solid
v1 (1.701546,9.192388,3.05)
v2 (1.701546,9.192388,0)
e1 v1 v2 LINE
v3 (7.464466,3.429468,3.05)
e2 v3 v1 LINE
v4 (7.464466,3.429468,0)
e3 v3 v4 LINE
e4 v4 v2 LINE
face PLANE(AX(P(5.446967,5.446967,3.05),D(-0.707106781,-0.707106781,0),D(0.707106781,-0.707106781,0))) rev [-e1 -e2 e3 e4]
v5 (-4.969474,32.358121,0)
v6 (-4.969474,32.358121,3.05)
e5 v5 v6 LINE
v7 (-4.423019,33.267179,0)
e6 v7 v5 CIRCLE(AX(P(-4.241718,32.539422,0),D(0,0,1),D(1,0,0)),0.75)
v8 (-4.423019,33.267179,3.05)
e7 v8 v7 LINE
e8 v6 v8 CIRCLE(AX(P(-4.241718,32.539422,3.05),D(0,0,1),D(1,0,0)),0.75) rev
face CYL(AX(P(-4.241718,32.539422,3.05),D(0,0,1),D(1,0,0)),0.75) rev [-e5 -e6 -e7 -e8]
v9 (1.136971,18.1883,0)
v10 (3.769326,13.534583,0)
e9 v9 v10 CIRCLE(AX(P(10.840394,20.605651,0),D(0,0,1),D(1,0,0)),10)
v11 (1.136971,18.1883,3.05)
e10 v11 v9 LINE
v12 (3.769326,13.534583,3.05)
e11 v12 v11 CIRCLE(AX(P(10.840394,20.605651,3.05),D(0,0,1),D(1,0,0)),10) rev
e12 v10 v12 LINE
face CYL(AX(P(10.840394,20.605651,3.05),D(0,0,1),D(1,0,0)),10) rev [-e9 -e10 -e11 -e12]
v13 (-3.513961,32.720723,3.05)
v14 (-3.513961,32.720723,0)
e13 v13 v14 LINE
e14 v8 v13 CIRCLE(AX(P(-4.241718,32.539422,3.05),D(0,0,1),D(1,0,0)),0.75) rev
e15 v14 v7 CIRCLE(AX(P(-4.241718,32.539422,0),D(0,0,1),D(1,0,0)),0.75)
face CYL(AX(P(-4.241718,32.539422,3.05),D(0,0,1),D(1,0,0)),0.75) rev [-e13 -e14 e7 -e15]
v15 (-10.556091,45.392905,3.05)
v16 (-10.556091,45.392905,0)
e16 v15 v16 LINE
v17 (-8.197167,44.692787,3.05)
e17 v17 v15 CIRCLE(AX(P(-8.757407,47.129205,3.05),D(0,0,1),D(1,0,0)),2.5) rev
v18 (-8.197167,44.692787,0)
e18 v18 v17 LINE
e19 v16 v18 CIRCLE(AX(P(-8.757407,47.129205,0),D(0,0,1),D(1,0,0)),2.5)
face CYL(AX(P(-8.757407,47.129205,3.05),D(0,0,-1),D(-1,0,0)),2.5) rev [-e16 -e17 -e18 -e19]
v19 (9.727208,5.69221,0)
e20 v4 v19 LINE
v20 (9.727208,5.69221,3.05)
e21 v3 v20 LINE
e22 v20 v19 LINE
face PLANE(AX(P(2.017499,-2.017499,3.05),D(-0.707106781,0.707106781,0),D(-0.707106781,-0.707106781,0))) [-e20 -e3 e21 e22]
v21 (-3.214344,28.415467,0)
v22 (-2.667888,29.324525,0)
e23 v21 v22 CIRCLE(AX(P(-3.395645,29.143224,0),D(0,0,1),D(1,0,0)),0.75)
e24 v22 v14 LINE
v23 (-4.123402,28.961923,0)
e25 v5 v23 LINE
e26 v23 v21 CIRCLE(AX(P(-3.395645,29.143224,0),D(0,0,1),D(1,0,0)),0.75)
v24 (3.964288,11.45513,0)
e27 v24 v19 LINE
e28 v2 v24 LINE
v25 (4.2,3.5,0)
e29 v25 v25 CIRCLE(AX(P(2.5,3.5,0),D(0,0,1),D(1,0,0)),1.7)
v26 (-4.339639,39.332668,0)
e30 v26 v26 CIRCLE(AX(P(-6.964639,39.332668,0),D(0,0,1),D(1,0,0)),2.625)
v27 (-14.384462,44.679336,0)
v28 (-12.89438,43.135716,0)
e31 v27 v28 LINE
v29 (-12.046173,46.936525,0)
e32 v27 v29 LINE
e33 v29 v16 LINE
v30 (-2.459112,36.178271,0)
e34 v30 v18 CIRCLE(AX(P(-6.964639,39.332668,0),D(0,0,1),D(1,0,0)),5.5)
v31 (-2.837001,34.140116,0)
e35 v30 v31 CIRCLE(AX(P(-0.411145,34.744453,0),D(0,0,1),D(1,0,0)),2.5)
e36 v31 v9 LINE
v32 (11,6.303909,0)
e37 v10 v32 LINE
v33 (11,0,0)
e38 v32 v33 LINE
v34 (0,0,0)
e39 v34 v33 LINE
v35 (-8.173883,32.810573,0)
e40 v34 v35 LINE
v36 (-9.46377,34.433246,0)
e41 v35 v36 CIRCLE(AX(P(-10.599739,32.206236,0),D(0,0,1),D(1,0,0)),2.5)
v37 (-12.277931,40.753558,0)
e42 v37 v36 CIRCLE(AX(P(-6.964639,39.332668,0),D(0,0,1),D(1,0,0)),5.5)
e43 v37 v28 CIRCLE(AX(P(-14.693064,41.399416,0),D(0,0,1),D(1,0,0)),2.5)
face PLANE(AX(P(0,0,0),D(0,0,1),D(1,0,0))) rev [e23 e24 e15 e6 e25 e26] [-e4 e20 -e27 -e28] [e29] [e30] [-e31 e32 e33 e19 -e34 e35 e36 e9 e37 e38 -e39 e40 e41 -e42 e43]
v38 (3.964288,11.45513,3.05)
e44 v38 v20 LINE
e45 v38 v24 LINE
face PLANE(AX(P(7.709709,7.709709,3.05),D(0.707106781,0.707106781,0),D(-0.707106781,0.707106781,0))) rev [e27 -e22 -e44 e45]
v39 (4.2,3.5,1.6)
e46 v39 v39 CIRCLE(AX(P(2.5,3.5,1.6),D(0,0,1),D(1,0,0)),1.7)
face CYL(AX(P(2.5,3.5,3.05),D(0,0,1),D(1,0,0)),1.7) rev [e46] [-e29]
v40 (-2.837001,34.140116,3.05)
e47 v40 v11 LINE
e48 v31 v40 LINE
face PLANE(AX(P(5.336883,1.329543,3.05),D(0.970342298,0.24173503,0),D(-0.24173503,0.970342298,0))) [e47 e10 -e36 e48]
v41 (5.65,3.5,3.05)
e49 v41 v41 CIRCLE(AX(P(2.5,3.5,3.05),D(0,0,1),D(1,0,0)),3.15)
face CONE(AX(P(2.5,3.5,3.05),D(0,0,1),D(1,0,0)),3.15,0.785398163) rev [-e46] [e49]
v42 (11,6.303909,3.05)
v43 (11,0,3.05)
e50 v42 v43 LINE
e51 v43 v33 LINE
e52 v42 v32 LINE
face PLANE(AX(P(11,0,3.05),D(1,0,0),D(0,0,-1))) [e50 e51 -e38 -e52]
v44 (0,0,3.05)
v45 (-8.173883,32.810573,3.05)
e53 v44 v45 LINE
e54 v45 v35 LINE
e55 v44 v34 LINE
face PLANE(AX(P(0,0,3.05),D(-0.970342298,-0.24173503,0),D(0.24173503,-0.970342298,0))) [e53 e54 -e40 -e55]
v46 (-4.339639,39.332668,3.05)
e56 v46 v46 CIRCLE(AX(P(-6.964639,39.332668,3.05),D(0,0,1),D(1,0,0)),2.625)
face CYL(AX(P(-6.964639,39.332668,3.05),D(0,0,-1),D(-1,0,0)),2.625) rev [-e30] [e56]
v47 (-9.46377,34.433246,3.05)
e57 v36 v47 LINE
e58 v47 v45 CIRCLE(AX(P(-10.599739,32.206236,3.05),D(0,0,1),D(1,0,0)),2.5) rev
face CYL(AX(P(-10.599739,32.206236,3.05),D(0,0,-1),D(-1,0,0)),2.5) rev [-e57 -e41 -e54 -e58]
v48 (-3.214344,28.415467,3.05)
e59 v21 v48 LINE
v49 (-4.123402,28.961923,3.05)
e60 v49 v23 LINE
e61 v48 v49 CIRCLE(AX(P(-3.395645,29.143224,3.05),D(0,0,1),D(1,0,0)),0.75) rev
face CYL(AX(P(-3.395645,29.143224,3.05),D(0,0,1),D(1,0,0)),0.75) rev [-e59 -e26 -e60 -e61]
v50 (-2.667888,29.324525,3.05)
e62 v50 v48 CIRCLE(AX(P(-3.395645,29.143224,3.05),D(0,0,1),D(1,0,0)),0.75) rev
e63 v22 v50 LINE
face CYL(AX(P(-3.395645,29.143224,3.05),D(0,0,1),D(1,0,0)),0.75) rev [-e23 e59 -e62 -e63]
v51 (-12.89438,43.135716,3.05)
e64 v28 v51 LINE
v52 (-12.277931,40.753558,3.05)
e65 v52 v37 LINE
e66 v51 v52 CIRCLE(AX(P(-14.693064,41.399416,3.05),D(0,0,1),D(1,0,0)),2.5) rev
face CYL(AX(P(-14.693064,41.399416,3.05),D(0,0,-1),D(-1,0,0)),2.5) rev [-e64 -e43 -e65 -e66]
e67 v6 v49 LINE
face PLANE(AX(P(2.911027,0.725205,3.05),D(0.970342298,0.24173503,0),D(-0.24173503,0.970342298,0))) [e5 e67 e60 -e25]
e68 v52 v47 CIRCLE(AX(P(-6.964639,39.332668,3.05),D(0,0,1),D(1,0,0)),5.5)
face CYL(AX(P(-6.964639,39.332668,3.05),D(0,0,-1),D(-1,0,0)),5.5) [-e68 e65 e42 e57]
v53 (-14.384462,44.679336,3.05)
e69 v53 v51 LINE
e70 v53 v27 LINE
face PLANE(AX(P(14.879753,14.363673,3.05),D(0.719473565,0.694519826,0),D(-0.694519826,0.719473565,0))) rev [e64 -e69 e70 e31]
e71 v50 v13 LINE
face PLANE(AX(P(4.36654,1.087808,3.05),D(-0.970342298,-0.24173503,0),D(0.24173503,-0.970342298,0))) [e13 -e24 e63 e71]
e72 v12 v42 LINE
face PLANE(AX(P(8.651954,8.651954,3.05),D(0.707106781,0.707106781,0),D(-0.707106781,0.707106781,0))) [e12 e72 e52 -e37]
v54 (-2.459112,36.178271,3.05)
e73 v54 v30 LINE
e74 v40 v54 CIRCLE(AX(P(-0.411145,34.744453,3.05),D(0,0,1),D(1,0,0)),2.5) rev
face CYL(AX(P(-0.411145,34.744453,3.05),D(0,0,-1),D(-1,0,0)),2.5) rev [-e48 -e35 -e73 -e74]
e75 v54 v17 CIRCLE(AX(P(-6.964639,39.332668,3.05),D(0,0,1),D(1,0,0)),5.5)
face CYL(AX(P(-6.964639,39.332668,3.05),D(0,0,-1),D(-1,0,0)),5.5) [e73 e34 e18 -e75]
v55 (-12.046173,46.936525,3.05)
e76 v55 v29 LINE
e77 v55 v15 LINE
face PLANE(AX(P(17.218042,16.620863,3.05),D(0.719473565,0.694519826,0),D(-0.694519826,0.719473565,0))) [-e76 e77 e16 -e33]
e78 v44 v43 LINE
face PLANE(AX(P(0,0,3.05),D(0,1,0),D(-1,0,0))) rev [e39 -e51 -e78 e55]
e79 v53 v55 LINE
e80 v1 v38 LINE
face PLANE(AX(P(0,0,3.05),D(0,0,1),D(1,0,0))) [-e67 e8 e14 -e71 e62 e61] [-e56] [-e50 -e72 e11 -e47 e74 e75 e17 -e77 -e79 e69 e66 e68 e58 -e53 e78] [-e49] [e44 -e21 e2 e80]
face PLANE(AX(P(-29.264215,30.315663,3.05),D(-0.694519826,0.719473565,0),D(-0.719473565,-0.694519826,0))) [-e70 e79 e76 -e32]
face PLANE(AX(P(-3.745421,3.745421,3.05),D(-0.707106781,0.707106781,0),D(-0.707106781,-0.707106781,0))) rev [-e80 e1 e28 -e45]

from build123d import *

# Parameters (mm, degrees)
SKETCH1_R           = 1.5
SKETCH1_R_2         = 2.625
BOSS_EXTRUDE1_DEPTH = 3.05
FILLET3_R           = 2.5
FILLET4_R           = 10
FILLET6_R           = 0.75


with BuildPart() as part:
    # Sketch1 → Boss-Extrude1 (new body)
    with BuildSketch(Plane.XY):
        with BuildLine():
            Line((-8.481662584, 34.046021185), (0, 0))
            Line((0, 0), (11, 0))
            Line((11, 0), (11, 6.303908615))
            Line((11, 6.303908615), (1.807611845, 15.496296771))
            Line((1.807611845, 15.496296771), (-3.144779945, 35.375563851))
            ThreePointArc((-3.144779945, 35.375563851), (-2.481245275, 42.518446356), (-9.444822751, 44.241709966))
            Line((-9.444822751, 44.241709966), (-12.046172881, 46.936525265))
            Line((-12.046172881, 46.936525265), (-14.384461968, 44.67933583))
            Line((-14.384461968, 44.67933583), (-11.783111838, 41.984520531))
            ThreePointArc((-11.783111838, 41.984520531), (-12.042982397, 37.220695866), (-8.481662584, 34.046021185))
        make_face()
        with Locations((2.5, 3.5)):
            Circle(SKETCH1_R, mode=Mode.SUBTRACT)
        Polygon((9.727207794, 5.692209589), (7.517499103, 3.482500897), (7.464466094, 3.429467889), (1.701545827, 9.192388155), (3.964287527, 11.455129855), align=None, mode=Mode.SUBTRACT)
        Polygon((-3.942100566, 28.234165792), (-5.150775718, 33.085877281), (-3.695262271, 33.448479827), (-2.48658712, 28.596768337), align=None, mode=Mode.SUBTRACT)
        with Locations((-6.964638989, 39.33266846)):
            Circle(SKETCH1_R_2, mode=Mode.SUBTRACT)
    extrude(amount=BOSS_EXTRUDE1_DEPTH)

    # Sketch3 → CSK for M3 Flat Head Machine Screw1 (revolve, cut)
    with BuildSketch(Plane(origin=(2.5, 3.5, 3.05), x_dir=(0, -1, 0), z_dir=(1, 0, 0))):
        Polygon((0, 0), (0, 3.05), (1.7, 3.05), (1.7, 1.45), (3.15, 0), align=None)
    revolve(axis=Axis((2.5, 3.5, 9.4), (0, 0, -1)), mode=Mode.SUBTRACT)

    # Fillet3
    fillet3_edges = [part.edges().sort_by_distance(p)[0] for p in [
        (-3.144779945, 35.375563851, 1.525),
        (-8.481662584, 34.046021185, 1.525),
        (-11.783111838, 41.984520531, 1.525),
        (-9.444822751, 44.241709966, 1.525),
    ]]
    fillet(fillet3_edges, radius=FILLET3_R)

    # Fillet4
    fillet4_edges = [part.edges().sort_by_distance(p)[0] for p in [
        (1.807611845, 15.496296771, 1.525),
    ]]
    fillet(fillet4_edges, radius=FILLET4_R)

    # Fillet6
    fillet6_edges = [part.edges().sort_by_distance(p)[0] for p in [
        (-2.48658712, 28.596768337, 1.525),
        (-3.942100566, 28.234165792, 1.525),
        (-3.695262271, 33.448479827, 1.525),
        (-5.150775718, 33.085877281, 1.525),
    ]]
    fillet(fillet6_edges, radius=FILLET6_R - 0.0001)  # a hair under: the kernel refuses the full size


solid = part.part
